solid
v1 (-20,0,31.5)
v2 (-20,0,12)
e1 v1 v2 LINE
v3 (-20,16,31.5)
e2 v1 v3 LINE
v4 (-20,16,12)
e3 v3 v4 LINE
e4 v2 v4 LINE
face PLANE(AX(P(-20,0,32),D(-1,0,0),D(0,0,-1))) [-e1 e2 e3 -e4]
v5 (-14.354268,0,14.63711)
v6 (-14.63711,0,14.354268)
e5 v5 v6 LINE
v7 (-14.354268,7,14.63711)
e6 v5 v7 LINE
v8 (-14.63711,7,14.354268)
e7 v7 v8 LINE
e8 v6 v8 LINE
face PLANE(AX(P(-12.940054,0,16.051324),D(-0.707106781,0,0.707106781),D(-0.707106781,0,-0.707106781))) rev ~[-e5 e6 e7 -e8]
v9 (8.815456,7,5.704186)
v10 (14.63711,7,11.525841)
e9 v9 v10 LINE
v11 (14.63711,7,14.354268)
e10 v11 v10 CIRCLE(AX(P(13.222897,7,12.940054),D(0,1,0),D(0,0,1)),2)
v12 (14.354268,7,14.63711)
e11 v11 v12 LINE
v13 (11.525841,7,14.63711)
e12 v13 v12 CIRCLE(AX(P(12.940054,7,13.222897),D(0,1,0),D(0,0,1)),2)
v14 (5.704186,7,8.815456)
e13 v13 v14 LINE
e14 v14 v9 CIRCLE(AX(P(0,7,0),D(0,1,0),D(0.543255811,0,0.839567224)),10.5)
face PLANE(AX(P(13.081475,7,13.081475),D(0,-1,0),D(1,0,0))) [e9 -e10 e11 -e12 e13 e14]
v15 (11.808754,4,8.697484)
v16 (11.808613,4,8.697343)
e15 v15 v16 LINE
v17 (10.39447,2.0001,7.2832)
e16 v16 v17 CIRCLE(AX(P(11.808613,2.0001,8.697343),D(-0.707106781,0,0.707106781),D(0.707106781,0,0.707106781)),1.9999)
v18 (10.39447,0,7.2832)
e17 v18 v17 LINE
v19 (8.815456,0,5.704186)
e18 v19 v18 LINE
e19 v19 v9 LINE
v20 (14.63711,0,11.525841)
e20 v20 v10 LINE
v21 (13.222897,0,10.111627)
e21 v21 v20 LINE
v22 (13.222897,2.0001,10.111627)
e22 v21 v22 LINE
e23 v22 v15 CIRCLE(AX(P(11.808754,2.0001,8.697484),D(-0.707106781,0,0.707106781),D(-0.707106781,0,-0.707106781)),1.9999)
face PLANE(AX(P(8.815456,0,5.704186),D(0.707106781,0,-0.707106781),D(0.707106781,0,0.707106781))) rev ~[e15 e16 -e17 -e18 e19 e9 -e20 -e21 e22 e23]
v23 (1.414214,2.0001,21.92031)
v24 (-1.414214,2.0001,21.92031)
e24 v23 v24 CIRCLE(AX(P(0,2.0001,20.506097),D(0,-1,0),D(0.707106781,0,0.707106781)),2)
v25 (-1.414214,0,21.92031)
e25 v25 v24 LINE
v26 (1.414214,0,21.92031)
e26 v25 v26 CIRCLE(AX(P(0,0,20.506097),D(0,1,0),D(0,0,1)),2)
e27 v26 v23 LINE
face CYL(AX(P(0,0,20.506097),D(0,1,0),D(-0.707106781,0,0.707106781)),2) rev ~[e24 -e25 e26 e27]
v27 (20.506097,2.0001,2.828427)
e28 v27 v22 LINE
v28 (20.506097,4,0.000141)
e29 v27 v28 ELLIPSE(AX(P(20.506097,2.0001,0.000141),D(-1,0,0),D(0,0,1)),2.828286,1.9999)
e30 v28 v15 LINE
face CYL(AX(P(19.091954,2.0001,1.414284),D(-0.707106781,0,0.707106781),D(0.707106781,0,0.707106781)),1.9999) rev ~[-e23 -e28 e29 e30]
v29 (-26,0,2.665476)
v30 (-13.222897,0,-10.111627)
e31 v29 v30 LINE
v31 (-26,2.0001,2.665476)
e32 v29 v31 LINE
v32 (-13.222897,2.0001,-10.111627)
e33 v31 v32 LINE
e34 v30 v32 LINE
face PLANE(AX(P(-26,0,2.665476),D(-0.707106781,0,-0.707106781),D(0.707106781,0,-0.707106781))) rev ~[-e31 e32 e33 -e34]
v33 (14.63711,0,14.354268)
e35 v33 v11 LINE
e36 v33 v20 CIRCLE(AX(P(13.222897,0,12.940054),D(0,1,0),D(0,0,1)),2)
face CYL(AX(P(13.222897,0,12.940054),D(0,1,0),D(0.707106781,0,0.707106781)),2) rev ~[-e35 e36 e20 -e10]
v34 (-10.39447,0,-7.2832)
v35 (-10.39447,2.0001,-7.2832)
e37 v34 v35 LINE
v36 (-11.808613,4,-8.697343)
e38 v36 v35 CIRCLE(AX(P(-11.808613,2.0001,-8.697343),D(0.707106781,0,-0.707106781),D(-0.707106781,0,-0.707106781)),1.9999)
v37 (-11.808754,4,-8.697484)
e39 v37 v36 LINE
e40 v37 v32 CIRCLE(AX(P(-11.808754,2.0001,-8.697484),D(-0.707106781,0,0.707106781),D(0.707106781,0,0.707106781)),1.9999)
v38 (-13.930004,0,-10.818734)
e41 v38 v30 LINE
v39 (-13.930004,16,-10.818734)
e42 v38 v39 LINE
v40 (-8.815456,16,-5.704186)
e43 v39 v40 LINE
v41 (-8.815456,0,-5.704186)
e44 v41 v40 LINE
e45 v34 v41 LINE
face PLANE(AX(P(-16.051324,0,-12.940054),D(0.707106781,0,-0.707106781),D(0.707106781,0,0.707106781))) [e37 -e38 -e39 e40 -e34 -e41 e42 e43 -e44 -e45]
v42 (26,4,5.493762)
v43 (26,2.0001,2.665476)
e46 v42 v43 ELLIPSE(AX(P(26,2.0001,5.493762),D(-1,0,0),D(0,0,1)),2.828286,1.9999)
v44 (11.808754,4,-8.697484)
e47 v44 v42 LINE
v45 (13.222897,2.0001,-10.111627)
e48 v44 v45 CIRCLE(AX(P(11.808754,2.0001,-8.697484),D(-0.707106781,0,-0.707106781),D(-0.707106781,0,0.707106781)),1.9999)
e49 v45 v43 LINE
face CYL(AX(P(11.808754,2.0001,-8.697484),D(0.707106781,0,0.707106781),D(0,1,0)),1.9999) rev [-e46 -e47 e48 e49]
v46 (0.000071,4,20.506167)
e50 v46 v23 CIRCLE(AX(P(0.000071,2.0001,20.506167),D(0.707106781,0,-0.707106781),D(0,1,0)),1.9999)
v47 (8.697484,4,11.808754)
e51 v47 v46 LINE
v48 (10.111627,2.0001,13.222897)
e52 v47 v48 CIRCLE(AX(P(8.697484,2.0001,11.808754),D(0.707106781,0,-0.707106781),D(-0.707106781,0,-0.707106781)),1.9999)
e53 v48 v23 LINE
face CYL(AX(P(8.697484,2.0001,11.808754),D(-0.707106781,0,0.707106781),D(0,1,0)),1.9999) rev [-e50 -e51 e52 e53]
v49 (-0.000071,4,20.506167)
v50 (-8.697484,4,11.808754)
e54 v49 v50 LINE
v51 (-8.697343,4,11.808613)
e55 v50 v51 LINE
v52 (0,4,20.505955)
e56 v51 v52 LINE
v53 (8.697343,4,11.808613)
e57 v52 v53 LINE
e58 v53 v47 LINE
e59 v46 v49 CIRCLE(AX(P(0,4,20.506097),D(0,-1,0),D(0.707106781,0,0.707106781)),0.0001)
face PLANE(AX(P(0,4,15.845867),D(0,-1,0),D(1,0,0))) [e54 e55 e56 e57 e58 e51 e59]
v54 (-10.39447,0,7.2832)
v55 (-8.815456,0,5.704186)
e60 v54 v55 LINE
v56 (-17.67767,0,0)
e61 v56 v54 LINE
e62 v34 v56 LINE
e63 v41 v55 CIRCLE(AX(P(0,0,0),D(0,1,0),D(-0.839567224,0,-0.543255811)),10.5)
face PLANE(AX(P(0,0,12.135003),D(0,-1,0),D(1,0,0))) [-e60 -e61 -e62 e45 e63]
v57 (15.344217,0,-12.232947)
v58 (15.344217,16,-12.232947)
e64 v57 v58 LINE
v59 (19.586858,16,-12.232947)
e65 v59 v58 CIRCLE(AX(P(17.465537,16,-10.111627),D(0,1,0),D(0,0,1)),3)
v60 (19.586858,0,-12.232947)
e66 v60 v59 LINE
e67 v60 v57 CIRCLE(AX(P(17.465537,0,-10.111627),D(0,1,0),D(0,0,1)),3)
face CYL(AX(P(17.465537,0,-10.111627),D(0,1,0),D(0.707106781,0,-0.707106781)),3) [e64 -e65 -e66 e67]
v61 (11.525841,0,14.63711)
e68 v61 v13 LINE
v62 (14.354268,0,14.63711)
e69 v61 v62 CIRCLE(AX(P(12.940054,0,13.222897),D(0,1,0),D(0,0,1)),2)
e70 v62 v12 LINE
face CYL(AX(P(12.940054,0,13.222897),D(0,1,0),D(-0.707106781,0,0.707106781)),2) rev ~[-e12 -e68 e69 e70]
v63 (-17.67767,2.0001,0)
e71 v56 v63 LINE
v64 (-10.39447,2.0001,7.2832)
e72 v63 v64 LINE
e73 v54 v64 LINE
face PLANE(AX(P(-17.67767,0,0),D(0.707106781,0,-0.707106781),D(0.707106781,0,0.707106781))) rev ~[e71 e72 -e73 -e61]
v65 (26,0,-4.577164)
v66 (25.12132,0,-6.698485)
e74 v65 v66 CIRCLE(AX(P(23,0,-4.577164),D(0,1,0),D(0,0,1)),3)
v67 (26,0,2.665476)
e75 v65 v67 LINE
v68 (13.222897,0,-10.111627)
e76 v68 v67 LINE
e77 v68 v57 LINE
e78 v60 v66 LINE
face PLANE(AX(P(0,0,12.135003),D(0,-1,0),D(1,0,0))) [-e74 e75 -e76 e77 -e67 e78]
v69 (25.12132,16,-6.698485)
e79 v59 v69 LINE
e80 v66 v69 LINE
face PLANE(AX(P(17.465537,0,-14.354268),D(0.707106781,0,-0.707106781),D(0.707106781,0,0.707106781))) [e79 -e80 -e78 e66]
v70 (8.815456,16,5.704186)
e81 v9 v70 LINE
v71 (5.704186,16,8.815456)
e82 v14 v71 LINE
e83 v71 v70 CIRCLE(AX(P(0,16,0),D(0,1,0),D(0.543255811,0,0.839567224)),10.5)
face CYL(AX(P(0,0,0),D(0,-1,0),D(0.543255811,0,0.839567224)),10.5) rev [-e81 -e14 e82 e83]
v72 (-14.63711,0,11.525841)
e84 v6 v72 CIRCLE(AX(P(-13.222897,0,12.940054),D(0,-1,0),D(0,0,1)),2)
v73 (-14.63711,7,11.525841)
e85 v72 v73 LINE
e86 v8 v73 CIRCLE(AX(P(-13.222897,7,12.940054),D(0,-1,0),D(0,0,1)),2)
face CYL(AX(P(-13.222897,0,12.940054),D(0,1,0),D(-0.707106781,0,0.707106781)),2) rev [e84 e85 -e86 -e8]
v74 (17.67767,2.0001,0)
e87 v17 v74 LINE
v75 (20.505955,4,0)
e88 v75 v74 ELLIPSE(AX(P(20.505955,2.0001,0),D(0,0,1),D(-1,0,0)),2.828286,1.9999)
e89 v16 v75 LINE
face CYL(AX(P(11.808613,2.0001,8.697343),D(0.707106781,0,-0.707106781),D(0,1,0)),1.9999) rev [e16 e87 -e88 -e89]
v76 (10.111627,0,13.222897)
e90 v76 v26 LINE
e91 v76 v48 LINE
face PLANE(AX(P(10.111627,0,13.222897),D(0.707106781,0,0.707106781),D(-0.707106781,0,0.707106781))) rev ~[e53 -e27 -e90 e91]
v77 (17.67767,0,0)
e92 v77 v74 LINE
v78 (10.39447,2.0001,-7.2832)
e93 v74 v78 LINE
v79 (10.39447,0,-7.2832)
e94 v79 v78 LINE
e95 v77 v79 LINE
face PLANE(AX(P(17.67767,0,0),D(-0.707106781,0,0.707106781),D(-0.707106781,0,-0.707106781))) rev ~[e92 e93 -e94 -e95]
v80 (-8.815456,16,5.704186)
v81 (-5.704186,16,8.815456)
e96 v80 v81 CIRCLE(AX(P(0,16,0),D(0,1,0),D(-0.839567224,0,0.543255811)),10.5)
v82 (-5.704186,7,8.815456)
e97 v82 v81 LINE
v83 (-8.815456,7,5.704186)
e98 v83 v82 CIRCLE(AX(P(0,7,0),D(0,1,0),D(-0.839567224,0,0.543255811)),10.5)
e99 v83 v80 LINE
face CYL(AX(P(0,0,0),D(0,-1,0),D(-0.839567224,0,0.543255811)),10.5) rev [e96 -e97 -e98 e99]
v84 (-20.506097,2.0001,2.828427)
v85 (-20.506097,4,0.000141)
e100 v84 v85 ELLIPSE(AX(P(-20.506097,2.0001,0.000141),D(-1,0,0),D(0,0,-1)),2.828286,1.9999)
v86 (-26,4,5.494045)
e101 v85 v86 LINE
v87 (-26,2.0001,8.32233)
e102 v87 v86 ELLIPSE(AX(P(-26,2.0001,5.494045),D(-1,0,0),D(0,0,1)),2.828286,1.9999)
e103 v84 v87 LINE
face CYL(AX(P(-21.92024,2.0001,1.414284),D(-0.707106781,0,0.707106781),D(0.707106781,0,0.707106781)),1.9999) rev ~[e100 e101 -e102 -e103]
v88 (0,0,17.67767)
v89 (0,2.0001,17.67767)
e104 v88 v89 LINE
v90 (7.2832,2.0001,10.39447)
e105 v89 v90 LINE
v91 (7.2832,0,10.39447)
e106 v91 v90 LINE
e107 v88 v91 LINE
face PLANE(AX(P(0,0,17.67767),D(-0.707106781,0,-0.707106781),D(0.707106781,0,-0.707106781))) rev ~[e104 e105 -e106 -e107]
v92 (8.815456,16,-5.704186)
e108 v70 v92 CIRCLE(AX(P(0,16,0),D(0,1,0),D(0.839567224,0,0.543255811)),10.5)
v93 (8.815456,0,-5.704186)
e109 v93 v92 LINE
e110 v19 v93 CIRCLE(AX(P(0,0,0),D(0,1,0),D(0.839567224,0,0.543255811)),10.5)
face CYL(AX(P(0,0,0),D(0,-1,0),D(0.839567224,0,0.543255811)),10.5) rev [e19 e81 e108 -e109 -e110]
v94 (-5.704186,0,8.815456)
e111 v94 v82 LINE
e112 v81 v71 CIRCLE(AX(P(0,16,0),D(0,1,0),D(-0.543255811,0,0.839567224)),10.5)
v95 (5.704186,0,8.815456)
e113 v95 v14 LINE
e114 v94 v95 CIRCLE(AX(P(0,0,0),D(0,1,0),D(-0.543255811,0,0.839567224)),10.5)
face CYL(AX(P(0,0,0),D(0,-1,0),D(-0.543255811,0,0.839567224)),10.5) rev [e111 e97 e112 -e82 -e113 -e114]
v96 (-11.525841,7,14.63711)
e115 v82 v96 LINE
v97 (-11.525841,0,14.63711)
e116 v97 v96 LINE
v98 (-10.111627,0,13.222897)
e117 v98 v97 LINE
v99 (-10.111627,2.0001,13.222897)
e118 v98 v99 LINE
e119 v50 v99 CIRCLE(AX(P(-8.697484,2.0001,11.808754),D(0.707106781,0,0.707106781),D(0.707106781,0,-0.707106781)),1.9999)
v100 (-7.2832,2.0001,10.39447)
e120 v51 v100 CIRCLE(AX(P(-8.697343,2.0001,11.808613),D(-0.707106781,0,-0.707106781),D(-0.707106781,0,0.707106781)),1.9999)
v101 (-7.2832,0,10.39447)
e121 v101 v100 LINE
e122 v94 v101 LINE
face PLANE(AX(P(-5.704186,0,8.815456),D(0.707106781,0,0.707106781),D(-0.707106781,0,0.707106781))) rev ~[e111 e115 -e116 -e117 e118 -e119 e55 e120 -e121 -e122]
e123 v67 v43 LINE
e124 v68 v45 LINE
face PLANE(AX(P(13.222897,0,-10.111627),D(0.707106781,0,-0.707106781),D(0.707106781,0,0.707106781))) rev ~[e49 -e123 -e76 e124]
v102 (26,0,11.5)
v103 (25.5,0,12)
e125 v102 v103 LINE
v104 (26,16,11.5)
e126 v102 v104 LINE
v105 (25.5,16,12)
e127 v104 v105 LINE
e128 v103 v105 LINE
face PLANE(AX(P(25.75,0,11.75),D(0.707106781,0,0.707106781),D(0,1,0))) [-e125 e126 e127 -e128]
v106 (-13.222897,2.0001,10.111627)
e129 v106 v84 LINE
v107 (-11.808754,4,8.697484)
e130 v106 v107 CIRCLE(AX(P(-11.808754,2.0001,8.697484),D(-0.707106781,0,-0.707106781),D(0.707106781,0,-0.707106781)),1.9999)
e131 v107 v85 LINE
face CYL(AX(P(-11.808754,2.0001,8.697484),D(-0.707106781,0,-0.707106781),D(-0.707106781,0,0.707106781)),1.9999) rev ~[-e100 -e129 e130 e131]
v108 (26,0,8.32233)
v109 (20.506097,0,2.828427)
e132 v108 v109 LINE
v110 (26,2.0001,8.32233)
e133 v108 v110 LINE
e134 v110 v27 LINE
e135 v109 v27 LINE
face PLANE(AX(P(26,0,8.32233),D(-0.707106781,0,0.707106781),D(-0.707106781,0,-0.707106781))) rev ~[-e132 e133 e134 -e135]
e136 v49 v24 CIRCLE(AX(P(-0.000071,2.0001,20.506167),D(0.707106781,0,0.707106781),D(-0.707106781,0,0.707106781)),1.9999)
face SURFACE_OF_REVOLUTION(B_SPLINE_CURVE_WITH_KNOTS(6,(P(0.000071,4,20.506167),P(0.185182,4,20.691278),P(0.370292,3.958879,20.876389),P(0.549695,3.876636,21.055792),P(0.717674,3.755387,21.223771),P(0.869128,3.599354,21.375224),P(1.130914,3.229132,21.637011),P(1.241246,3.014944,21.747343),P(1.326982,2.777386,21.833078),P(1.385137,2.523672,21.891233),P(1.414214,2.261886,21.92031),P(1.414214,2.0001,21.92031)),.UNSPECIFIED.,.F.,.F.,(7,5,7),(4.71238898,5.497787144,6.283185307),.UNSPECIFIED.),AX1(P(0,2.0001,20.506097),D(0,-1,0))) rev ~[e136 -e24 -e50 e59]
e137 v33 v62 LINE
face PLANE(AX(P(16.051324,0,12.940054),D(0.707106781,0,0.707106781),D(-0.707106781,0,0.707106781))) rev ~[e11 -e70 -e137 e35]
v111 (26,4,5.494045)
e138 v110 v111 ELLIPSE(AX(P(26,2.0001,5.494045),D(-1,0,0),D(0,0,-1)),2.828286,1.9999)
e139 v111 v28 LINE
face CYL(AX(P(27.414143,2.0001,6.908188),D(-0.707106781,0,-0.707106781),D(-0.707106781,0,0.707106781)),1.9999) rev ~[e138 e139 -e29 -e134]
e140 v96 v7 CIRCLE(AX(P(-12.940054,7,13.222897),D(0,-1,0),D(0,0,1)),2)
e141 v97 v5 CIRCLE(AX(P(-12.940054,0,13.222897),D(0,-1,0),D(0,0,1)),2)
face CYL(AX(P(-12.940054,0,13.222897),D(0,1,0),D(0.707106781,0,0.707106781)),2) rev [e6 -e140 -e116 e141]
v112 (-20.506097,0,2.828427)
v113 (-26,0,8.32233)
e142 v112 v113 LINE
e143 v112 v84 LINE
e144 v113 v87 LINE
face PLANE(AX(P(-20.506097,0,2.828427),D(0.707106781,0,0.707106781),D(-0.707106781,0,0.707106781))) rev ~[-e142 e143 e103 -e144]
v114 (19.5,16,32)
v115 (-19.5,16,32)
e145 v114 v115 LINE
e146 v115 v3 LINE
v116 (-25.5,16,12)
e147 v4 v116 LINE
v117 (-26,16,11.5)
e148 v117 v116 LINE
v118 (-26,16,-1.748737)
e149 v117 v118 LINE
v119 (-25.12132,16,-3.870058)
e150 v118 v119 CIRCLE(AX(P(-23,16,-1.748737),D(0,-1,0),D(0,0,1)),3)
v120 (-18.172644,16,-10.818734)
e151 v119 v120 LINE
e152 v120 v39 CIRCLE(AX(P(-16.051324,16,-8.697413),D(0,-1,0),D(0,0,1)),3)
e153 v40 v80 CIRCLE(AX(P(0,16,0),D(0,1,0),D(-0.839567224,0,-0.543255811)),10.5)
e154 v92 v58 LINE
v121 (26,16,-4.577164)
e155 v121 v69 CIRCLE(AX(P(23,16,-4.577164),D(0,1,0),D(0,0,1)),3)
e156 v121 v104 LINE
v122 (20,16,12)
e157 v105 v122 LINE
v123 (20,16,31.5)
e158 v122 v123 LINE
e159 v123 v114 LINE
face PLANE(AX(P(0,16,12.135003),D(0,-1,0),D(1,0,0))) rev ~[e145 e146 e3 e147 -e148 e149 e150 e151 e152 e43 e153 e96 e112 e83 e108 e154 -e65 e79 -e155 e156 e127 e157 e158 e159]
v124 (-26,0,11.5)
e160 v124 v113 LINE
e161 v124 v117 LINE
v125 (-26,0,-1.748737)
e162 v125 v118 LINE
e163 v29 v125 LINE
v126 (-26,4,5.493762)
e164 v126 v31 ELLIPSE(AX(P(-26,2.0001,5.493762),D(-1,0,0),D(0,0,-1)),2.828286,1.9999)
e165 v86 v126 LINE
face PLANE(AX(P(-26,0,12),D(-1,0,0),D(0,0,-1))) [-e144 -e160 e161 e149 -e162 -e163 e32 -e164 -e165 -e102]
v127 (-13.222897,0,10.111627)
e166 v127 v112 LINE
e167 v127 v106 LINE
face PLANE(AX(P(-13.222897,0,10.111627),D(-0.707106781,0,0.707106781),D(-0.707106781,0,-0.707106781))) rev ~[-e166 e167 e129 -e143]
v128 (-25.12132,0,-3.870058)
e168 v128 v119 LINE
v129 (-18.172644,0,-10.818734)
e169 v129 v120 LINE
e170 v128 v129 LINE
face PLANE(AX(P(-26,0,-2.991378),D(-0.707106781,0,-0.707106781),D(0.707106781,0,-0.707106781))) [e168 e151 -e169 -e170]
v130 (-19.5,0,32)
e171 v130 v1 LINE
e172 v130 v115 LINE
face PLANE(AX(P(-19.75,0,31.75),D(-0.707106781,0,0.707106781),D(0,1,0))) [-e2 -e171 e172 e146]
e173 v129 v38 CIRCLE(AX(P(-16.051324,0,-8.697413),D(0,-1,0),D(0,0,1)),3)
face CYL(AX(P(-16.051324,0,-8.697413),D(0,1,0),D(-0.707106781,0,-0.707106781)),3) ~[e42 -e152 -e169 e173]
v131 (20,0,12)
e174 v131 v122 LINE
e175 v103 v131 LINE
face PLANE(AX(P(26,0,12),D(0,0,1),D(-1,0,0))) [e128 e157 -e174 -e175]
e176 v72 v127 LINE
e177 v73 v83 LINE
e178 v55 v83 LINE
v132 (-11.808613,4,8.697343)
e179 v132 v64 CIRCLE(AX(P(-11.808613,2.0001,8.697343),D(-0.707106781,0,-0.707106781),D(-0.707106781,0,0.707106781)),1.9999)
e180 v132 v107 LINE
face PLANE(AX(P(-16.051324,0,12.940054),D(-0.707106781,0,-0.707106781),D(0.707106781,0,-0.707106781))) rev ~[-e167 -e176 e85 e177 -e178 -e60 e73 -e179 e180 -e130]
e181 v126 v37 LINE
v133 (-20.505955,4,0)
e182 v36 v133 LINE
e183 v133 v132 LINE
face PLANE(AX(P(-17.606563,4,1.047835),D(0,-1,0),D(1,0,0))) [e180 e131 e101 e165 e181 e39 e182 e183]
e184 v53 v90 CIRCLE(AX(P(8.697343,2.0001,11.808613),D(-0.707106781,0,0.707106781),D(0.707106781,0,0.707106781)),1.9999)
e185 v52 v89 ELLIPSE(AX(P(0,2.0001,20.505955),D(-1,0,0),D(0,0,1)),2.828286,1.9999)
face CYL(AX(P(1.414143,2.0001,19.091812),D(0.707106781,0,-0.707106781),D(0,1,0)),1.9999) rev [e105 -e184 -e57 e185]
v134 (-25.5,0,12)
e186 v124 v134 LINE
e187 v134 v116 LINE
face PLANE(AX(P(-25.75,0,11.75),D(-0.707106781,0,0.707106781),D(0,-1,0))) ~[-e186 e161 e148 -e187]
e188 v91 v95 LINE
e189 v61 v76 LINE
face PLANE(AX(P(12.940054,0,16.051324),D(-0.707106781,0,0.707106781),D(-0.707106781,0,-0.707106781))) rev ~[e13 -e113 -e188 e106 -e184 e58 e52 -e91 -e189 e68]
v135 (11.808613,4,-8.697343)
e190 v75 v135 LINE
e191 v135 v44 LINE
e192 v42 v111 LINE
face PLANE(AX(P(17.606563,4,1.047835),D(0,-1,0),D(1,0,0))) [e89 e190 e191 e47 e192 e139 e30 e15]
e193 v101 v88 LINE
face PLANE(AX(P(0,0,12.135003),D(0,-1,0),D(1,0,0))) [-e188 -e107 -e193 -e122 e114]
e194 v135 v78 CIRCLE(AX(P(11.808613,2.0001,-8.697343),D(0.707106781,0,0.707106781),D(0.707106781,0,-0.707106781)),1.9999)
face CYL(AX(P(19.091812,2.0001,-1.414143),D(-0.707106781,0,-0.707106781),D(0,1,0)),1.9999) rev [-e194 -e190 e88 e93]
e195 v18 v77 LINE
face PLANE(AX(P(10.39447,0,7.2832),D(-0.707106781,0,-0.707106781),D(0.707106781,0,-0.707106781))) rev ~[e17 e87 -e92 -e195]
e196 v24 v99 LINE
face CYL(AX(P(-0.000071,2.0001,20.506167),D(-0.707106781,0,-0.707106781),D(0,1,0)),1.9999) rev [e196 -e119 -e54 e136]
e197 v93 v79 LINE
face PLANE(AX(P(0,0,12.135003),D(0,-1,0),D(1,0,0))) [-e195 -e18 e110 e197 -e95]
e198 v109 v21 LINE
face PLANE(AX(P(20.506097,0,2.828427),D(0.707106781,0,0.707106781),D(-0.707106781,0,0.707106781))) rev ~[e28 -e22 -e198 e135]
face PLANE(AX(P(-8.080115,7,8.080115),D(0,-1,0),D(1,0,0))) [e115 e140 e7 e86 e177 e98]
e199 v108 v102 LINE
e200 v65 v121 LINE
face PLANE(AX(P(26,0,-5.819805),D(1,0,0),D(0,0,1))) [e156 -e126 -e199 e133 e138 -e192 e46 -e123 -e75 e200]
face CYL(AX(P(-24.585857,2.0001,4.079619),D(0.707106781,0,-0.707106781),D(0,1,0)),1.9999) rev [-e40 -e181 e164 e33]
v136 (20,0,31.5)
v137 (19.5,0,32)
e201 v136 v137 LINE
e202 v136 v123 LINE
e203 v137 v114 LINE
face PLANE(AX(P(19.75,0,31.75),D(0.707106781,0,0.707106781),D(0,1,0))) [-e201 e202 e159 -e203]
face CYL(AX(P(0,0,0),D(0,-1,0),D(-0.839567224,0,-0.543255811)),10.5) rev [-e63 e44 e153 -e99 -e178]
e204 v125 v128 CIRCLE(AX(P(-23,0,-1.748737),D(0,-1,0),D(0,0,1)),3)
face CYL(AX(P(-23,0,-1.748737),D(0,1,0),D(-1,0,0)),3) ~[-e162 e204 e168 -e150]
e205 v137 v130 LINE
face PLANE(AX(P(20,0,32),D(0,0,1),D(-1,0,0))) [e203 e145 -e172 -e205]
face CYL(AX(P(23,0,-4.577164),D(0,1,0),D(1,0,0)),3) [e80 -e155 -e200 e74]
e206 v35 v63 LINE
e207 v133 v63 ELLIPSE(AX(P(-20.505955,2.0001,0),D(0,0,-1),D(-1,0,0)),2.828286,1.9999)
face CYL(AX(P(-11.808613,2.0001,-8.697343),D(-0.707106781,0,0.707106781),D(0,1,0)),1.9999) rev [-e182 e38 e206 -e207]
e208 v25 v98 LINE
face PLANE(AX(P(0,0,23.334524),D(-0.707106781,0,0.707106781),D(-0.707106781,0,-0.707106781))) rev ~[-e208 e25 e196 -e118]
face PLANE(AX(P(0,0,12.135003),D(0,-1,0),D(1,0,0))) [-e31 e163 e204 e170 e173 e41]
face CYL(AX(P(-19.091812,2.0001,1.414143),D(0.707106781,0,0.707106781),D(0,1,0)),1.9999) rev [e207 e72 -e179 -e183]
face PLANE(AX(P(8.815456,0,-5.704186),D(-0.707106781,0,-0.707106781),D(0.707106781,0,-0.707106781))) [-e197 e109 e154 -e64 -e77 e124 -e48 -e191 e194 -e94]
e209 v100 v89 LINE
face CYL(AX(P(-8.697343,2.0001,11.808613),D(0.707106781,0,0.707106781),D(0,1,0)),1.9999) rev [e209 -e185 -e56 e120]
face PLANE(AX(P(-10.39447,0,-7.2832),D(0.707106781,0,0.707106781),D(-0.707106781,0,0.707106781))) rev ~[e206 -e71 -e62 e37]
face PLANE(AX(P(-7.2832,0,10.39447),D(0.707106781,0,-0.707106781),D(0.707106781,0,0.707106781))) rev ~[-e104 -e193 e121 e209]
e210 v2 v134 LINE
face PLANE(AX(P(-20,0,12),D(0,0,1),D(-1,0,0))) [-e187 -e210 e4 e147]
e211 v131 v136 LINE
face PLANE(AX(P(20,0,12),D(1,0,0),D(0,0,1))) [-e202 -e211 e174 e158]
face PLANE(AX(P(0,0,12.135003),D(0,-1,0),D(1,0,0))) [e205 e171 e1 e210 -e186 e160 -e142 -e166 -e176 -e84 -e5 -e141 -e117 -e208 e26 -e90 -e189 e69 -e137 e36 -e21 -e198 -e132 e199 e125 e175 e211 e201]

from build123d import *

# Parameters (mm, degrees)
F1_DEPTH = 16
F2_DEPTH = 7
F3_DEPTH = 4
F4_R     = 2
F5_R     = 1.9999
F6_R     = 3
F7_SIZE  = 0.5


# Not quite as in the source:
# - a fillet or chamfer is up to 0.001 mm smaller than in the source, because OpenCascade refuses the exact size
# - a feature names something its author has since deleted; it is built from what else it names


with BuildPart() as f1:
    # F0 (on Front) → F1 (new body)
    with BuildSketch(Plane.XZ):
        with BuildLine():
            ThreePointArc((-5.7041860158, 8.815455853), (0, 10.5), (5.7041860158, 8.815455853))
            Line((5.7041860158, 8.815455853), (7.2831998462, 10.3944696834))
            Line((7.2831998462, 10.3944696834), (0, 17.6776695297))
            Line((0, 17.6776695297), (-7.2831998462, 10.3944696834))
            Line((-7.2831998462, 10.3944696834), (-5.7041860158, 8.815455853))
        make_face()
        with BuildLine():
            ThreePointArc((-8.815455853, 5.7041860158), (-7.4246212025, 7.4246212025), (-5.7041860158, 8.815455853))
            Line((-5.7041860158, 8.815455853), (-7.2831998462, 10.3944696834))
            Line((-7.2831998462, 10.3944696834), (-10.3944696834, 7.2831998462))
            Line((-10.3944696834, 7.2831998462), (-8.815455853, 5.7041860158))
        make_face()
        with BuildLine():
            ThreePointArc((-8.815455853, -5.7041860158), (-10.5, 0), (-8.815455853, 5.7041860158))
            Line((-8.815455853, 5.7041860158), (-10.3944696834, 7.2831998462))
            Line((-10.3944696834, 7.2831998462), (-17.6776695297, 0))
            Line((-17.6776695297, 0), (-10.3944696834, -7.2831998462))
            Line((-10.3944696834, -7.2831998462), (-8.815455853, -5.7041860158))
        make_face()
        with BuildLine():
            ThreePointArc((5.7041860158, 8.815455853), (7.4246212025, 7.4246212025), (8.815455853, 5.7041860158))
            Line((8.815455853, 5.7041860158), (10.3944696834, 7.2831998462))
            Line((10.3944696834, 7.2831998462), (7.2831998462, 10.3944696834))
            Line((7.2831998462, 10.3944696834), (5.7041860158, 8.815455853))
        make_face()
        Polygon((0, 17.6776695297), (7.2831998462, 10.3944696834), (10.111626971, 13.2228968082), (0, 23.3345237792), (-10.111626971, 13.2228968082), (-7.2831998462, 10.3944696834), align=None)
        Polygon((7.2831998462, 10.3944696834), (10.3944696834, 7.2831998462), (13.2228968082, 10.111626971), (10.111626971, 13.2228968082), align=None)
        Polygon((-10.3944696834, 7.2831998462), (-7.2831998462, 10.3944696834), (-10.111626971, 13.2228968082), (-13.2228968082, 10.111626971), align=None)
        Polygon((-17.6776695297, 0), (-10.3944696834, 7.2831998462), (-13.2228968082, 10.111626971), (-20.5060966544, 2.8284271247), (-26, 8.3223304703), (-26, 2.6654762208), (-13.2228968082, -10.111626971), (-10.3944696834, -7.2831998462), align=None)
        Polygon((-13.2228968082, 10.111626971), (-10.111626971, 13.2228968082), (-12.9400540957, 16.0513239329), (-16.0513239329, 12.9400540957), align=None)
        Polygon((17.6776695297, 0), (10.3944696834, -7.2831998462), (13.2228968082, -10.111626971), (26, 2.6654762208), (26, 8.3223304703), (20.5060966544, 2.8284271247), (13.2228968082, 10.111626971), (10.3944696834, 7.2831998462), align=None)
        with BuildLine():
            ThreePointArc((8.815455853, 5.7041860158), (10.5, 0), (8.815455853, -5.7041860158))
            Line((8.815455853, -5.7041860158), (10.3944696834, -7.2831998462))
            Line((10.3944696834, -7.2831998462), (17.6776695297, 0))
            Line((17.6776695297, 0), (10.3944696834, 7.2831998462))
            Line((10.3944696834, 7.2831998462), (8.815455853, 5.7041860158))
        make_face()
        Polygon((16.0513239329, 12.9400540957), (13.2228968082, 10.111626971), (20.5060966544, 2.8284271247), (26, 8.3223304703), (26, 12), (20, 12), (20, 32), (0, 32), (-20, 32), (-20, 12), (-26, 12), (-26, 8.3223304703), (-20.5060966544, 2.8284271247), (-13.2228968082, 10.111626971), (-16.0513239329, 12.9400540957), (-12.9400540957, 16.0513239329), (-10.111626971, 13.2228968082), (0, 23.3345237792), (10.111626971, 13.2228968082), (12.9400540957, 16.0513239329), align=None)
        Polygon((10.111626971, 13.2228968082), (13.2228968082, 10.111626971), (16.0513239329, 12.9400540957), (12.9400540957, 16.0513239329), align=None)
        Polygon((26, 2.6654762208), (13.2228968082, -10.111626971), (17.4655374953, -14.3542676581), (26, -5.8198051534), align=None)
        Polygon((-16.0513239329, -12.9400540957), (-13.2228968082, -10.111626971), (-26, 2.6654762208), (-26, -2.9913780286), align=None)
    extrude(amount=-F1_DEPTH)

    # F0 (on Front) → F2 (cut)
    with BuildSketch(Plane.XZ):
        Polygon((10.111626971, 13.2228968082), (13.2228968082, 10.111626971), (16.0513239329, 12.9400540957), (12.9400540957, 16.0513239329), align=None)
        Polygon((7.2831998462, 10.3944696834), (10.3944696834, 7.2831998462), (13.2228968082, 10.111626971), (10.111626971, 13.2228968082), align=None)
        with BuildLine():
            ThreePointArc((5.7041860158, 8.815455853), (7.4246212025, 7.4246212025), (8.815455853, 5.7041860158))
            Line((8.815455853, 5.7041860158), (10.3944696834, 7.2831998462))
            Line((10.3944696834, 7.2831998462), (7.2831998462, 10.3944696834))
            Line((7.2831998462, 10.3944696834), (5.7041860158, 8.815455853))
        make_face()
        with BuildLine():
            ThreePointArc((-8.815455853, 5.7041860158), (-7.4246212025, 7.4246212025), (-5.7041860158, 8.815455853))
            Line((-5.7041860158, 8.815455853), (-7.2831998462, 10.3944696834))
            Line((-7.2831998462, 10.3944696834), (-10.3944696834, 7.2831998462))
            Line((-10.3944696834, 7.2831998462), (-8.815455853, 5.7041860158))
        make_face()
        Polygon((-13.2228968082, 10.111626971), (-10.111626971, 13.2228968082), (-12.9400540957, 16.0513239329), (-16.0513239329, 12.9400540957), align=None)
        Polygon((-10.3944696834, 7.2831998462), (-7.2831998462, 10.3944696834), (-10.111626971, 13.2228968082), (-13.2228968082, 10.111626971), align=None)
    extrude(amount=-F2_DEPTH, mode=Mode.SUBTRACT)

    # F0 (on Front) → F3 (cut)
    with BuildSketch(Plane.XZ):
        Polygon((0, 17.6776695297), (7.2831998462, 10.3944696834), (10.111626971, 13.2228968082), (0, 23.3345237792), (-10.111626971, 13.2228968082), (-7.2831998462, 10.3944696834), align=None)
        Polygon((17.6776695297, 0), (10.3944696834, -7.2831998462), (13.2228968082, -10.111626971), (26, 2.6654762208), (26, 8.3223304703), (20.5060966544, 2.8284271247), (13.2228968082, 10.111626971), (10.3944696834, 7.2831998462), align=None)
        Polygon((-17.6776695297, 0), (-10.3944696834, 7.2831998462), (-13.2228968082, 10.111626971), (-20.5060966544, 2.8284271247), (-26, 8.3223304703), (-26, 2.6654762208), (-13.2228968082, -10.111626971), (-10.3944696834, -7.2831998462), align=None)
    extrude(amount=-F3_DEPTH, mode=Mode.SUBTRACT)

    # F4
    f4_edges = [f1.edges().sort_by_distance(p)[0] for p in [
        (-16.051324, 3.5, 12.940054),
        (-12.940054, 3.5, 16.051324),
        (12.940054, 3.5, 16.051324),
        (16.051324, 3.5, 12.940054),
        (0, 2, 23.334524),
    ]]
    fillet(f4_edges, radius=F4_R)

    # F5 (radius 2 in the source; OpenCascade refuses exactly that, so slightly less here)
    f5_edges = [f1.edges().sort_by_distance(p)[0] for p in [
        (19.611448, 4, -3.723075),
        (14.03607, 4, -3.6416),
        (14.03607, 4, 3.6416),
        (16.864497, 4, 6.470027),
        (5.76292, 4, 17.571604),
        (-16.864497, 4, 6.470027),
        (-23.253048, 4, 5.575379),
        (-14.03607, 4, -3.6416),
        (-3.6416, 4, 14.03607),
        (-14.03607, 4, 3.6416),
        (-19.611448, 4, -3.723075),
        (23.253048, 4, 5.575379),
        (0, 4, 22.506097),
        (-5.76292, 4, 17.571604),
        (3.6416, 4, 14.03607),
    ]]
    fillet(f5_edges, radius=F5_R)

    # F6
    f6_edges = [f1.edges().sort_by_distance(p)[0] for p in [
        (17.465537, 8, -14.354268),
        (-16.051324, 8, -12.940054),
        (26, 8, -5.819805),
        (-26, 8, -2.991378),
    ]]
    fillet(f6_edges, radius=F6_R)

    # F7
    f7_edges = [f1.edges().sort_by_distance(p)[0] for p in [
        (20, 8, 32),
        (26, 8, 12),
        (-20, 8, 32),
        (-26, 8, 12),
    ]]
    chamfer(f7_edges, length=F7_SIZE)


solid = f1.part
